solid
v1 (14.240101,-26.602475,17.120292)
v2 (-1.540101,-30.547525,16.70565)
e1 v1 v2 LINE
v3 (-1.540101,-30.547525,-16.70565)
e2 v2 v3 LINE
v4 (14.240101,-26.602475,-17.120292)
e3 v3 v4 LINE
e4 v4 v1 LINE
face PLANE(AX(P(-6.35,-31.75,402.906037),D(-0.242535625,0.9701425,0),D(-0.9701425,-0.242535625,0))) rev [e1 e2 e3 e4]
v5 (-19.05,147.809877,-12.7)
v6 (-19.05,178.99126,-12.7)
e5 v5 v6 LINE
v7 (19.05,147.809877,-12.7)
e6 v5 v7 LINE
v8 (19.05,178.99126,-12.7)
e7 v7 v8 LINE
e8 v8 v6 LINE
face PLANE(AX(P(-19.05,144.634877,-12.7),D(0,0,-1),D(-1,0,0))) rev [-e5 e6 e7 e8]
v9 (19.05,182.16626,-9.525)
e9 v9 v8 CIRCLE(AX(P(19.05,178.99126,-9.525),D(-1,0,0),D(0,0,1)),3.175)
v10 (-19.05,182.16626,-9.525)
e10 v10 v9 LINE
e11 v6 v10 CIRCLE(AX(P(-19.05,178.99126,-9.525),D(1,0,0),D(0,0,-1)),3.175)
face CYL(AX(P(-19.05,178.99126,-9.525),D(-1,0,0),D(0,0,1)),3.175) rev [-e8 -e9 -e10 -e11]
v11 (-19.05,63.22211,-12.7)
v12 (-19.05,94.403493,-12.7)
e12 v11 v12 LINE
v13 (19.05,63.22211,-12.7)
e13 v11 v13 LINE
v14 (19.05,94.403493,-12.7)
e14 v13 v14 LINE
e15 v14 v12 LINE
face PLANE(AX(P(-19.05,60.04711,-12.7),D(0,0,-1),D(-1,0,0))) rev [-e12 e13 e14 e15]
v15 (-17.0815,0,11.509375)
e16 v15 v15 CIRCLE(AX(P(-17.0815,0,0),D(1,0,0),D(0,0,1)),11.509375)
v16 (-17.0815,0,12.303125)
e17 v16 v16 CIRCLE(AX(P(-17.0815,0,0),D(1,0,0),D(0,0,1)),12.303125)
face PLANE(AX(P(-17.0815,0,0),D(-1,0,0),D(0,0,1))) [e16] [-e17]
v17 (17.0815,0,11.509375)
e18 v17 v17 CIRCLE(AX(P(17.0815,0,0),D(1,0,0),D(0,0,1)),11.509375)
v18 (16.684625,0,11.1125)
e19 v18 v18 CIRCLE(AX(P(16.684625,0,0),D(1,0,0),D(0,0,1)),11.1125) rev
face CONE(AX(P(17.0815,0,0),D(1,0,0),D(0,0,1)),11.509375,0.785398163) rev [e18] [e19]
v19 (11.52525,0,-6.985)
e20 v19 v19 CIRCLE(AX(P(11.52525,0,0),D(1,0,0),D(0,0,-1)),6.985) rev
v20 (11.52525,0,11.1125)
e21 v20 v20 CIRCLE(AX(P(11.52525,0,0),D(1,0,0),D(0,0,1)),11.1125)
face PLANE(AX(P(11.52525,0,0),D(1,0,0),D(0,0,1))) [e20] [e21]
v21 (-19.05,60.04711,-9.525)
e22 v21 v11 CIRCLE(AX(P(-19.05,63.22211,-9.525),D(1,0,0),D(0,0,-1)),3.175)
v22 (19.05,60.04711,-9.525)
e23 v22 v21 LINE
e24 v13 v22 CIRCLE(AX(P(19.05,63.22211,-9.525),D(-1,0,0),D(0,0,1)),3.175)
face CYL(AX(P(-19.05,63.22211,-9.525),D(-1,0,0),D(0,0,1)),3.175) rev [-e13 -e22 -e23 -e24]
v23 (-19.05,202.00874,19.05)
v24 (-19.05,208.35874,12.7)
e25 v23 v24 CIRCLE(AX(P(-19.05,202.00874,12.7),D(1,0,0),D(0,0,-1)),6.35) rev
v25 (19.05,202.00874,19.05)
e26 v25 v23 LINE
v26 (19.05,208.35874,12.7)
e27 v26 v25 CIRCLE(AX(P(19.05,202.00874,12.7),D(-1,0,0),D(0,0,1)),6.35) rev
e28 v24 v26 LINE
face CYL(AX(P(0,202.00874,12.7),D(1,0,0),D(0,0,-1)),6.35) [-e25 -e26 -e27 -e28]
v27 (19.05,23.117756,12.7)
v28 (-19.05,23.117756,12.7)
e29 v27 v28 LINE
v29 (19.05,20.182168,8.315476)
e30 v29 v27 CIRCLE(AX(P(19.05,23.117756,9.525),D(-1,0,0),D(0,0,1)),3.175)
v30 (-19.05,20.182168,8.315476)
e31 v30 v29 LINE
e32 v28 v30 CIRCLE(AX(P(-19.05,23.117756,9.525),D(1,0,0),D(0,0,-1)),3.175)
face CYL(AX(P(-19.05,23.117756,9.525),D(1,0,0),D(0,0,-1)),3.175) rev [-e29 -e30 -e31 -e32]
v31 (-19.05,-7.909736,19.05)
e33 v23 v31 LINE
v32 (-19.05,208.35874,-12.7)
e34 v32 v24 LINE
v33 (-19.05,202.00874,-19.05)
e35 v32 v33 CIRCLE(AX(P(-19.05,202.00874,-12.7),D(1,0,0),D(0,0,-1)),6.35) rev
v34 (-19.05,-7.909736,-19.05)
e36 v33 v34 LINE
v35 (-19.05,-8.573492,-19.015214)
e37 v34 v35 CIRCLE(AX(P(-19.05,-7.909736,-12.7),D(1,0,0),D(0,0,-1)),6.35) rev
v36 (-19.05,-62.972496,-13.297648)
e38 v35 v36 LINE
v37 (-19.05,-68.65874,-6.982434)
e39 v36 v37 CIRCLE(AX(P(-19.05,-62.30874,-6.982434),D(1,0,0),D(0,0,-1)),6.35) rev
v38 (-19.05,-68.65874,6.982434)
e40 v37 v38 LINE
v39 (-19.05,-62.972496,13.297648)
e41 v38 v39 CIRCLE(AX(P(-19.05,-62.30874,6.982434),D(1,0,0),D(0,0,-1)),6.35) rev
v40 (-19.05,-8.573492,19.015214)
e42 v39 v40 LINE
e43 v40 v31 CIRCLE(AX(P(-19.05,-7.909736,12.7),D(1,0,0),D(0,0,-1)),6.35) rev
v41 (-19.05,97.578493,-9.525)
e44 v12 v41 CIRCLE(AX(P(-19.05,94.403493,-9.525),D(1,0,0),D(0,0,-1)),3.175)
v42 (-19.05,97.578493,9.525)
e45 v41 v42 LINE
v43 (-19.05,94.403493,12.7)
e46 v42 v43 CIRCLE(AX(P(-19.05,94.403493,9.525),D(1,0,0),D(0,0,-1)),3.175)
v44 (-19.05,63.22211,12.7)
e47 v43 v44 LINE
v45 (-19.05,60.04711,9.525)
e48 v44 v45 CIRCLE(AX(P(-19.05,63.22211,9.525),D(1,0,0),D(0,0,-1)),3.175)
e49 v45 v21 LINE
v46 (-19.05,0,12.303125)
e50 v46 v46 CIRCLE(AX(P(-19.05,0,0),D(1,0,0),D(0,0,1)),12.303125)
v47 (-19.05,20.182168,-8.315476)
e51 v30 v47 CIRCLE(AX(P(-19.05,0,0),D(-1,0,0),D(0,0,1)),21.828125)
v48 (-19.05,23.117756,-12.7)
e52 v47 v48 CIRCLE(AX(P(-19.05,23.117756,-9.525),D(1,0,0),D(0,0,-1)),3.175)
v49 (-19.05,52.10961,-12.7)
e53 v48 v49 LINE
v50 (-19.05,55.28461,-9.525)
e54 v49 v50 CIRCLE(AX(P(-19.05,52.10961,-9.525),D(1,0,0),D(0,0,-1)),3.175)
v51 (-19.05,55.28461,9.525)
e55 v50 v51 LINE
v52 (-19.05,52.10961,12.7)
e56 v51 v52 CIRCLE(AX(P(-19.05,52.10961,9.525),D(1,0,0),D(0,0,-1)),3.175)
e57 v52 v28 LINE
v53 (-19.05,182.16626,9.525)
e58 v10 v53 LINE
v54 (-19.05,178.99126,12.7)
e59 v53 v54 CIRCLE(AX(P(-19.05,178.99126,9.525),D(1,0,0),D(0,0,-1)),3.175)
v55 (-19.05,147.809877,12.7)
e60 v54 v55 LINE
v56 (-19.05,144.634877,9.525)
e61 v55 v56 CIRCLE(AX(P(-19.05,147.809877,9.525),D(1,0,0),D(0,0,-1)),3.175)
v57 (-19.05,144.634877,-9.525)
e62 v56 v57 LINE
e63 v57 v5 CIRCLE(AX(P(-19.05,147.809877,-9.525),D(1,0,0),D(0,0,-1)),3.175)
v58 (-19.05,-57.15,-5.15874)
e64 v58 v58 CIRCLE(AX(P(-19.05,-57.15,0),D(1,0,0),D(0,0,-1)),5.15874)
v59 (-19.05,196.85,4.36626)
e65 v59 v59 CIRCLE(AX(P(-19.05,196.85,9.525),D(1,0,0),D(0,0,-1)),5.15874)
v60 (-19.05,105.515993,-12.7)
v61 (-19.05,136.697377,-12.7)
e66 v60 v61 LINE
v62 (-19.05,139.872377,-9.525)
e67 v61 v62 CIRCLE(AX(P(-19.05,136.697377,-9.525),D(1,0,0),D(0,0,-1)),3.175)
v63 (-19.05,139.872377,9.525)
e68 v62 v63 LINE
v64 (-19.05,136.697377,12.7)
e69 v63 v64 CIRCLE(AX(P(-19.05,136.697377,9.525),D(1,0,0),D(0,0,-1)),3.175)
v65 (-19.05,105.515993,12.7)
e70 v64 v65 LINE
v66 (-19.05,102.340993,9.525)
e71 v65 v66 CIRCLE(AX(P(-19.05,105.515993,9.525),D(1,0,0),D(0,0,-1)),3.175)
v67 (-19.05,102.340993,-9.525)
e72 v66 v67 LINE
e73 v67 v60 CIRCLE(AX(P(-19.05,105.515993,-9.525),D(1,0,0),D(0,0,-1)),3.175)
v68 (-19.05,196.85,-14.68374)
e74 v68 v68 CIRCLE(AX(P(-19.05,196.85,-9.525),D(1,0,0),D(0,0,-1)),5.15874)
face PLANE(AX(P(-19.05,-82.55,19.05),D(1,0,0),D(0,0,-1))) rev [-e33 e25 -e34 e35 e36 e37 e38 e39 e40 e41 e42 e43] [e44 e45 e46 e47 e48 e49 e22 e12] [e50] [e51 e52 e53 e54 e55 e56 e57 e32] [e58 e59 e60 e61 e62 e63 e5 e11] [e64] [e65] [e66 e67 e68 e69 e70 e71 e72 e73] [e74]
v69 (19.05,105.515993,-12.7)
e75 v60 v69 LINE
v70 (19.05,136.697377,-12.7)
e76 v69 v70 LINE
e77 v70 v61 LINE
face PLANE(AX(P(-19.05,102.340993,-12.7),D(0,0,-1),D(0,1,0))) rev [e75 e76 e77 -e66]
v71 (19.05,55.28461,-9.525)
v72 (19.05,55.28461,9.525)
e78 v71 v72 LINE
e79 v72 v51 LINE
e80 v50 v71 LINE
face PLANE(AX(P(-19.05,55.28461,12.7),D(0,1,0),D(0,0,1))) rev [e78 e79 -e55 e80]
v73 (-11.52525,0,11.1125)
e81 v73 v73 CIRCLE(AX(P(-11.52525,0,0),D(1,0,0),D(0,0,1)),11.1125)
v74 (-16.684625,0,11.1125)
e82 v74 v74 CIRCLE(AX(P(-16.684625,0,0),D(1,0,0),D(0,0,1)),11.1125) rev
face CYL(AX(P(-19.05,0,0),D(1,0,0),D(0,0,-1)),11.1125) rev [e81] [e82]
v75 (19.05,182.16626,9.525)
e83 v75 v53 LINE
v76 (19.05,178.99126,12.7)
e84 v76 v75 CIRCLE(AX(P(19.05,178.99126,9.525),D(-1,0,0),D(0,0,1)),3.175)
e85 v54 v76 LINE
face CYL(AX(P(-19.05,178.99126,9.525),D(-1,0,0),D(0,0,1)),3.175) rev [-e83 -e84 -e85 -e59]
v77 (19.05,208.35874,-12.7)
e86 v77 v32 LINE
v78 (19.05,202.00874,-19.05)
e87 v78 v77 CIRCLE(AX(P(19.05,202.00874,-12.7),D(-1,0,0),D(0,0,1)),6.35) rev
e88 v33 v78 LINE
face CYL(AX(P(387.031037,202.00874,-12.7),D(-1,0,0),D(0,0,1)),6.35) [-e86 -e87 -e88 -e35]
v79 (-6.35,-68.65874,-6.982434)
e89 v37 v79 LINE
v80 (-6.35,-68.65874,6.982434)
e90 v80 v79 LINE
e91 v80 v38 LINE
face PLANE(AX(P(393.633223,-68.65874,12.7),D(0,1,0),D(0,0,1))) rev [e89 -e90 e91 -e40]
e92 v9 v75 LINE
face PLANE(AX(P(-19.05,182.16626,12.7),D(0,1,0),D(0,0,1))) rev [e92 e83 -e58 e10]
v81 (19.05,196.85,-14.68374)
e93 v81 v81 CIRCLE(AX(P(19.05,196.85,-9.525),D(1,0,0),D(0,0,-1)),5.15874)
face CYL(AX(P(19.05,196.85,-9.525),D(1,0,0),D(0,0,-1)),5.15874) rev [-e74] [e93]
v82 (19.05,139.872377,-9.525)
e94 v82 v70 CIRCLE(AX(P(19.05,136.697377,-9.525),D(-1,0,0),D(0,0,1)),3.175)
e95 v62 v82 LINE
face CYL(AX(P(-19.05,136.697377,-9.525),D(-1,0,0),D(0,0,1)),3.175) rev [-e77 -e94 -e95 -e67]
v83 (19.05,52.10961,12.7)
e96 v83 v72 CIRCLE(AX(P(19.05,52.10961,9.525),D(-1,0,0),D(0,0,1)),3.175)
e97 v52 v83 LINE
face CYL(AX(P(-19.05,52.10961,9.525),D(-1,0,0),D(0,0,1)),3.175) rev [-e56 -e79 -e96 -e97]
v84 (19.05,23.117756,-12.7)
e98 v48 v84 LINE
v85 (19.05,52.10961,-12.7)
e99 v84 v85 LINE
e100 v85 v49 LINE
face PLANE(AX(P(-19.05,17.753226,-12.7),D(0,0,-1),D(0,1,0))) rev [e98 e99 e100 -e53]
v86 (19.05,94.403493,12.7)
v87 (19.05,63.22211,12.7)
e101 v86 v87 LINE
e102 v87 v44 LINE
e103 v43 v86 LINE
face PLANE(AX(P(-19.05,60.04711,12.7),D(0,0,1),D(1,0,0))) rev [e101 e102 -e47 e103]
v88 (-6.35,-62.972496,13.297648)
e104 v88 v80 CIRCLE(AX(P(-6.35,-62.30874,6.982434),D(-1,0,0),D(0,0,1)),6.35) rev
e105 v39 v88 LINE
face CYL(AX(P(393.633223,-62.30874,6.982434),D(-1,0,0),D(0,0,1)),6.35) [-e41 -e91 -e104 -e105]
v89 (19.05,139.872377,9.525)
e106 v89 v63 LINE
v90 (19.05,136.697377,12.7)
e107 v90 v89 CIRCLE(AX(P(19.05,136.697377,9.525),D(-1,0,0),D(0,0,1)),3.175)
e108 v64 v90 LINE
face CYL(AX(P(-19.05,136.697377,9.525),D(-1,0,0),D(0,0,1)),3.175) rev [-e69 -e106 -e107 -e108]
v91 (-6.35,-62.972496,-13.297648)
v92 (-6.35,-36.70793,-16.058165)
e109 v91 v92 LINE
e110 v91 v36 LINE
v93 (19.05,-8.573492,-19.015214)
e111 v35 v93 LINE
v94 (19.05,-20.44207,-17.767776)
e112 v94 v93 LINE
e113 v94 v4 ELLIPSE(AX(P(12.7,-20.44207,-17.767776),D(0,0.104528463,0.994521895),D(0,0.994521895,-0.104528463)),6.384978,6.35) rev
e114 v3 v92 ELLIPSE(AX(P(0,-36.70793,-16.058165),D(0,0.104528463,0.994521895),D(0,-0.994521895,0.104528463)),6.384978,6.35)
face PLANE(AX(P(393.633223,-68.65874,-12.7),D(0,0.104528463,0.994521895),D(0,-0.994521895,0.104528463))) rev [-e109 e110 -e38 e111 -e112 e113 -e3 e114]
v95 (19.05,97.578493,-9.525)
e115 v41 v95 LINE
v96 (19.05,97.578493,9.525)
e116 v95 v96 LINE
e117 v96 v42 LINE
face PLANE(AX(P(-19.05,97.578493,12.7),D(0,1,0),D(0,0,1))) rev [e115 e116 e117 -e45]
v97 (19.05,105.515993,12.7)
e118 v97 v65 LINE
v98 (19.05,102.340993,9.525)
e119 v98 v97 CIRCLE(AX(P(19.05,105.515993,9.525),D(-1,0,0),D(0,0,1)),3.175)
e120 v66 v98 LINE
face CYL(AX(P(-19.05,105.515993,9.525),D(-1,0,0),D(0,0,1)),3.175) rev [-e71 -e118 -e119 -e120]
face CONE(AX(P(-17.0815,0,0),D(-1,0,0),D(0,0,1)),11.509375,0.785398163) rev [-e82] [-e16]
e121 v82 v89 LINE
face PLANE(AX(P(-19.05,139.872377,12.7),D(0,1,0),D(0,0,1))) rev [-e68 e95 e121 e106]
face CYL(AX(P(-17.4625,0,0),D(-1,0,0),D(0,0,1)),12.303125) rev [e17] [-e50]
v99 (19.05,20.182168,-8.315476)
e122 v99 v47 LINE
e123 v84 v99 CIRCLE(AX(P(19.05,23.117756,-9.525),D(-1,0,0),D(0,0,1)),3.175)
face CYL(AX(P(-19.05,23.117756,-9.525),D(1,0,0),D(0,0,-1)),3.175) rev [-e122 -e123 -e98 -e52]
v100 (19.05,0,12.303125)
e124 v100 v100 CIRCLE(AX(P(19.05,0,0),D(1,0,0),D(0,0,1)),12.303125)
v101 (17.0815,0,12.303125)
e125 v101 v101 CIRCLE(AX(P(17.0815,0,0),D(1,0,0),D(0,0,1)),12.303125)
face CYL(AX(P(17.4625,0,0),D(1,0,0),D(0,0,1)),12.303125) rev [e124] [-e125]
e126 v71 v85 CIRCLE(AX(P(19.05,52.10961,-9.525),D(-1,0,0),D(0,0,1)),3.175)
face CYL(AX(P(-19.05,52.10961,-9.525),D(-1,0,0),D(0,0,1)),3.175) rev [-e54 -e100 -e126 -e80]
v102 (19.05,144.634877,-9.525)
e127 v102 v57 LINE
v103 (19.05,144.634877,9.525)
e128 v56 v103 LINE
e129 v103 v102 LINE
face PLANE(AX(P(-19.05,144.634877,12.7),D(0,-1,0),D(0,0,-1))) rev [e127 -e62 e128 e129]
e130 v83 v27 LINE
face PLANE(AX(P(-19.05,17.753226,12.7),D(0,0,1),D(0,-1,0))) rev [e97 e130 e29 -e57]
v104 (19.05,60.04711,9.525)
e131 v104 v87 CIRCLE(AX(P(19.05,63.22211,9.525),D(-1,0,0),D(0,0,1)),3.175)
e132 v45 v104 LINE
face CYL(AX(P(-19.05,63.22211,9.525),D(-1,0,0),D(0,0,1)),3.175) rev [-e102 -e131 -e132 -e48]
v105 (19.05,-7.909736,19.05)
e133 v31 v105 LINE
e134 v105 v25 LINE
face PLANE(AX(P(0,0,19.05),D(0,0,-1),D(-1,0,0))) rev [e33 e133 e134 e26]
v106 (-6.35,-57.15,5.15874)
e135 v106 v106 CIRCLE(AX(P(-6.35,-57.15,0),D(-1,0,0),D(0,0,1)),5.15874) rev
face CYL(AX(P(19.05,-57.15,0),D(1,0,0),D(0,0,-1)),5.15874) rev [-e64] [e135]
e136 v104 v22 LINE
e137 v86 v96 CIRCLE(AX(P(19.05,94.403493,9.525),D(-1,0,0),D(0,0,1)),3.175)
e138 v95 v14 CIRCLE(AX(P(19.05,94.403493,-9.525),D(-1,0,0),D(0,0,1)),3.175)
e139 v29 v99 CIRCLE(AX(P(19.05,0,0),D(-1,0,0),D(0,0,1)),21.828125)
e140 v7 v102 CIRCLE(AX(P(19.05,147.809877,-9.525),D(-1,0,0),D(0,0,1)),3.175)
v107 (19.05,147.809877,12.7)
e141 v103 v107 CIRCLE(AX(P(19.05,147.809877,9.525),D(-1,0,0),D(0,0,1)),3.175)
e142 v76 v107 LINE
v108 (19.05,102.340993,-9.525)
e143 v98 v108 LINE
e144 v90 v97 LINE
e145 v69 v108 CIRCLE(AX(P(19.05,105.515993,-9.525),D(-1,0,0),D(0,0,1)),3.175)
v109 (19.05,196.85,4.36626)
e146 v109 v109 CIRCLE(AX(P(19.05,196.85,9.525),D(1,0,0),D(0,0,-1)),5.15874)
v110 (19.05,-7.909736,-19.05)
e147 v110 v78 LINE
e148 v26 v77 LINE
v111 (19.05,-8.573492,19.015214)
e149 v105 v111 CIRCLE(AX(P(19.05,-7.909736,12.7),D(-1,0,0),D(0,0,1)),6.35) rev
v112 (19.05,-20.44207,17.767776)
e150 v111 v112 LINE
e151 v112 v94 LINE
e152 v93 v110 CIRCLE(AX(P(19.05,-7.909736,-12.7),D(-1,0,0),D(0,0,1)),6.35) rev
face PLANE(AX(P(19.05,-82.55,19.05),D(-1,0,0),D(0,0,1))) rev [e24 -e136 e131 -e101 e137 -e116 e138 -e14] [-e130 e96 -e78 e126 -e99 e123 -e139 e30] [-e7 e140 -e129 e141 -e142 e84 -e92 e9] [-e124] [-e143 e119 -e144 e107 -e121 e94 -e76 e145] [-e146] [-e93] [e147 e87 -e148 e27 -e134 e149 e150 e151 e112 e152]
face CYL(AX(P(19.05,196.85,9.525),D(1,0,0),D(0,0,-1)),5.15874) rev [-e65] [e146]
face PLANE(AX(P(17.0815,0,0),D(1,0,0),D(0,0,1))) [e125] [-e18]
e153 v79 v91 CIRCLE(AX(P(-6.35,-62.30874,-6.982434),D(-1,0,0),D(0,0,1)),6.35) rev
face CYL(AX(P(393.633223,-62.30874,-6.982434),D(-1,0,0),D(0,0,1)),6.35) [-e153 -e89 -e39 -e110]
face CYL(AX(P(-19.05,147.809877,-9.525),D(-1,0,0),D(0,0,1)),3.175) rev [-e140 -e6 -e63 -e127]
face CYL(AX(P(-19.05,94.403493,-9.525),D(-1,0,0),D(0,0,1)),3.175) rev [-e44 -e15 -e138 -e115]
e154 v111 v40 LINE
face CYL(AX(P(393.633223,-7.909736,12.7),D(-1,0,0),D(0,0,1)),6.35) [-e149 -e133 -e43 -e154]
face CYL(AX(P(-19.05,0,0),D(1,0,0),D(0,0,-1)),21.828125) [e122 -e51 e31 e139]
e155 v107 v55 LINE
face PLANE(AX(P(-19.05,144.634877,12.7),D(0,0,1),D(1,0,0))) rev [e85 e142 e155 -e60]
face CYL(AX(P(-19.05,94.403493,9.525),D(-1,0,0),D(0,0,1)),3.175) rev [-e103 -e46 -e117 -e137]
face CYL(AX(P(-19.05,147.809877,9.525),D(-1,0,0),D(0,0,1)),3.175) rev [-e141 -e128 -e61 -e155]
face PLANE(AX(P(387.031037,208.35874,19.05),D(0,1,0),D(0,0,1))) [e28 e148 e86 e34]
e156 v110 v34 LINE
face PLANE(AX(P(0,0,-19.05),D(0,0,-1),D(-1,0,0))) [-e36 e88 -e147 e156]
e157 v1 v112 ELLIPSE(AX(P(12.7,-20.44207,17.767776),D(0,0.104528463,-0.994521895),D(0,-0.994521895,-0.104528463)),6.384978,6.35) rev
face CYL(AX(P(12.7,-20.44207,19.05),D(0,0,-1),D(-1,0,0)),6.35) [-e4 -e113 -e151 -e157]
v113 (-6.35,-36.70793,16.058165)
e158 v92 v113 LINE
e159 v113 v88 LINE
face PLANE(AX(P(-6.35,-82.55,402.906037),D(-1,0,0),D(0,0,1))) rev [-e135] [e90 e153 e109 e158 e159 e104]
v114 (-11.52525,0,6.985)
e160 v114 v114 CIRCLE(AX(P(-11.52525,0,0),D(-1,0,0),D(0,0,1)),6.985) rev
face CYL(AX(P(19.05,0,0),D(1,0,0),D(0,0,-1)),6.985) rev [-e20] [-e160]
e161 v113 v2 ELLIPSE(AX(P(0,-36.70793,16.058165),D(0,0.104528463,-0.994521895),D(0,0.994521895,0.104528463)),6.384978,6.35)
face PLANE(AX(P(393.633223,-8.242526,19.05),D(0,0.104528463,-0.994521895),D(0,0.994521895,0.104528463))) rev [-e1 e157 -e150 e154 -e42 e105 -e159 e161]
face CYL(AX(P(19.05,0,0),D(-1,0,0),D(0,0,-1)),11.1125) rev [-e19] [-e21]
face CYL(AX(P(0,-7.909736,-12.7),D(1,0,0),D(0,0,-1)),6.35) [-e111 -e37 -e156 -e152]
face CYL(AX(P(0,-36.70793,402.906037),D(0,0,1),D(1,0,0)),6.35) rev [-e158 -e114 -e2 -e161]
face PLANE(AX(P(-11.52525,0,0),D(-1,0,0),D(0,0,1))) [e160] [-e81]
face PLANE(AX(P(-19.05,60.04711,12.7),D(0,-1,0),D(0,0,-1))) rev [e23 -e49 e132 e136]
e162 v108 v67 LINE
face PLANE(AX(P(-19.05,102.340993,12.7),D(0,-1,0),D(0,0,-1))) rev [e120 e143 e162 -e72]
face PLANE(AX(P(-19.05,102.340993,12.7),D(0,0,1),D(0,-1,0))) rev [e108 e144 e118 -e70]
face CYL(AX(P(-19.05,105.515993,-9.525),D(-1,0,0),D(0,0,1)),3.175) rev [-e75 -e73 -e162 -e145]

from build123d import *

# Parameters (mm, degrees)
SKETCH5_W               = 38.1
SKETCH5_H               = 298.45
BOSS_EXTRUDE2_DEPTH     = 19.05
F_3_8_CLEARANCE_HOLE2_D = 10.31748
F_3_8_CLEARANCE_HOLE4_D = 13.97
BODY_MOVE_COPY4_ANGLE   = 90
F_3_8_CLEARANCE_HOLE3_D = 10.31748
CUT_EXTRUDE1_DEPTH      = 218.574389578
CUT_EXTRUDE1_DEPTH_BACK = 218.574389578
CUT_EXTRUDE2_DEPTH      = 218.574389578
CUT_EXTRUDE2_DEPTH_BACK = 218.574389578
SKETCH12_W              = 25.4
SKETCH12_H              = 37.531383446
SKETCH12_H_2            = 37.531383447
CUT_EXTRUDE3_DEPTH      = 218.574389578
CUT_EXTRUDE3_DEPTH_BACK = 218.574389578
CUT_EXTRUDE5_DEPTH      = 211.093240097
CUT_EXTRUDE5_DEPTH_BACK = 211.093240097
FILLET1_R               = 3.175
FILLET2_R               = 6.35
FILLET3_R               = 6.35


with BuildPart() as part:
    # Sketch5 → Boss-Extrude2 (new, symmetric)
    with BuildSketch(Plane.XY):
        with Locations((0, 66.675)):
            Rectangle(SKETCH5_W, SKETCH5_H)
    extrude(amount=BOSS_EXTRUDE2_DEPTH, both=True)

    # 3/8 Clearance Hole2 (through all)
    with Locations(Plane(origin=(19.05, 0, 0), x_dir=(0, 0, -1), z_dir=(1, 0, 0))):
        with Locations((0, -57.15)):
            Hole(F_3_8_CLEARANCE_HOLE2_D / 2)

    # 3/8 Clearance Hole4 (through all)
    with Locations(Plane(origin=(19.05, 0, 0), x_dir=(0, 0, -1), z_dir=(1, 0, 0))):
        with Locations((0, 0)):
            Hole(F_3_8_CLEARANCE_HOLE4_D / 2)


with BuildPart() as body_2:
    # uxcell-FR6ZZ: read off the stored shape, not the designer's step
    # uxcell-FR6ZZ outline → uxcell-FR6ZZ (revolve)
    with BuildSketch(Plane(origin=(46.870492888, 0, -67.456601715), x_dir=(1, 0, 0), z_dir=(0, 0, 1))):
        Polygon((12.303125, 146.229545606), (4.7625, 146.229545606), (4.7625, 138.704795606), (11.1125, 138.704795606), (11.1125, 143.864170606), (11.509375, 144.261045606), (12.303125, 144.261045606), align=None)
    revolve(axis=Axis((46.870492888, 0, -67.456601715), (0, 1, 0)))


with BuildPart() as body_2_1:
    # Body-Move/Copy4: read off the stored shape, not the designer's step
    # Body-Move/Copy4: moved
    add(body_2.part.moved(Location((-46.8704929, -127.1795456, 67.4566017))).rotate(Axis((0, 0, 0), (0, 0, -1)), BODY_MOVE_COPY4_ANGLE))


with BuildPart() as body_3:
    # Mirror1: mirrored copy
    add(body_2_1.part.mirror(Plane(origin=(0, 0, 0), x_dir=(0, 0, 1), z_dir=(1, 0, 0))))


with BuildPart() as part_1:
    add(part.part)

    # Combine2: cut body 3, body 2
    add(body_3.part, mode=Mode.SUBTRACT)
    add(body_2_1.part, mode=Mode.SUBTRACT)

    # 3/8 Clearance Hole3 (through all)
    with Locations(Plane(origin=(19.05, 0, 0), x_dir=(0, 0, -1), z_dir=(1, 0, 0))):
        with Locations((-9.525, 196.85), (9.525, 196.85)):
            Hole(F_3_8_CLEARANCE_HOLE3_D / 2)

    # Sketch11 → Cut-Extrude1 (cut, two sides: drawn at the far end of the back side and taken through both)
    with BuildSketch(Plane.XY.offset(-CUT_EXTRUDE1_DEPTH_BACK)):
        Polygon((-6.35, -691.607801887), (-6.35, -82.55), (-6.35, -31.75), (19.05, -25.4), (609.922858655, 122.318214664), (1581.067185153, -612.994182394), (964.794326498, -1426.920198945), align=None)
    extrude(amount=CUT_EXTRUDE1_DEPTH + CUT_EXTRUDE1_DEPTH_BACK, mode=Mode.SUBTRACT)

    # Sketch12 → Cut-Extrude2 (cut, two sides: drawn at the far end of the back side and taken through both)
    with BuildSketch(Plane(origin=(0, 0, 0), x_dir=(0, 0, -1), z_dir=(1, 0, 0)).offset(-CUT_EXTRUDE2_DEPTH_BACK)):
        with Locations((0, 163.400568277)):
            Rectangle(SKETCH12_W, SKETCH12_H)
        with Locations((0, 121.106684831)):
            Rectangle(SKETCH12_W, SKETCH12_H_2)
        with Locations((0, 78.812801384)):
            Rectangle(SKETCH12_W, SKETCH12_H)
        with BuildLine():
            Line((12.7, 17.753226214), (12.7, 55.284609661))
            Line((12.7, 55.284609661), (-12.7, 55.284609661))
            Line((-12.7, 55.284609661), (-12.7, 17.753226214))
            ThreePointArc((-12.7, 17.753226214), (0, 21.828125), (12.7, 17.753226214))
        make_face()
    extrude(amount=CUT_EXTRUDE2_DEPTH + CUT_EXTRUDE2_DEPTH_BACK, mode=Mode.SUBTRACT)

    # Sketch16 → Cut-Extrude3 (cut, two sides: drawn at the far end of the back side and taken through both)
    with BuildSketch(Plane(origin=(0, 0, 0), x_dir=(0, 0, -1), z_dir=(1, 0, 0)).offset(-CUT_EXTRUDE3_DEPTH_BACK)):
        Polygon((-615.836179143, 208.35874), (-19.05, 208.35874), (19.05, 208.35874), (615.836179143, 208.35874), (615.836179143, 1401.931098287), (-615.836179143, 1401.931098287), align=None)
    extrude(amount=CUT_EXTRUDE3_DEPTH + CUT_EXTRUDE3_DEPTH_BACK, mode=Mode.SUBTRACT)

    # Sketch18 → Cut-Extrude5 (cut, two sides: drawn at the far end of the back side and taken through both)
    with BuildSketch(Plane(origin=(0, 0, 0), x_dir=(0, 0, -1), z_dir=(1, 0, 0)).offset(-CUT_EXTRUDE5_DEPTH_BACK)):
        Polygon((-66.072467933, 439.146371732), (-19.05, -8.242525716), (-12.7, -68.65874), (12.7, -68.65874), (19.05, -8.242525716), (66.072467933, 439.146371732), (66.072467933, -460.560109405), (-66.072467933, -460.560109405), align=None)
    extrude(amount=CUT_EXTRUDE5_DEPTH + CUT_EXTRUDE5_DEPTH_BACK, mode=Mode.SUBTRACT)

    # Fillet1
    fillet1_edges = [part_1.edges().sort_by_distance(p)[0] for p in [
        (0, 60.047109661, -12.7),
        (0, 60.047109661, 12.7),
        (0, 55.284609661, 12.7),
        (0, 55.284609661, -12.7),
        (0, 17.753226214, -12.7),
        (0, 17.753226214, 12.7),
        (0, 182.16626, -12.7),
        (0, 144.634876554, -12.7),
        (0, 144.634876554, 12.7),
        (0, 182.16626, 12.7),
        (0, 139.872376554, 12.7),
        (0, 139.872376554, -12.7),
        (0, 102.340993107, -12.7),
        (0, 102.340993107, 12.7),
        (0, 97.578493107, 12.7),
        (0, 97.578493107, -12.7),
    ]]
    fillet(fillet1_edges, radius=FILLET1_R)

    # Fillet2
    fillet2_edges = [part_1.edges().sort_by_distance(p)[0] for p in [
        (0, 208.35874, -19.05),
        (0, 208.35874, 19.05),
        (0, -8.242525716, 19.05),
        (-12.7, -68.65874, 12.7),
        (-12.7, -68.65874, -12.7),
        (0, -8.242525716, -19.05),
    ]]
    fillet(fillet2_edges, radius=FILLET2_R)

    # Fillet3
    fillet3_edges = [part_1.edges().sort_by_distance(p)[0] for p in [
        (-6.35, -31.75, 0),
        (19.05, -25.4, 0),
    ]]
    fillet(fillet3_edges, radius=FILLET3_R)


solid = part_1.part
